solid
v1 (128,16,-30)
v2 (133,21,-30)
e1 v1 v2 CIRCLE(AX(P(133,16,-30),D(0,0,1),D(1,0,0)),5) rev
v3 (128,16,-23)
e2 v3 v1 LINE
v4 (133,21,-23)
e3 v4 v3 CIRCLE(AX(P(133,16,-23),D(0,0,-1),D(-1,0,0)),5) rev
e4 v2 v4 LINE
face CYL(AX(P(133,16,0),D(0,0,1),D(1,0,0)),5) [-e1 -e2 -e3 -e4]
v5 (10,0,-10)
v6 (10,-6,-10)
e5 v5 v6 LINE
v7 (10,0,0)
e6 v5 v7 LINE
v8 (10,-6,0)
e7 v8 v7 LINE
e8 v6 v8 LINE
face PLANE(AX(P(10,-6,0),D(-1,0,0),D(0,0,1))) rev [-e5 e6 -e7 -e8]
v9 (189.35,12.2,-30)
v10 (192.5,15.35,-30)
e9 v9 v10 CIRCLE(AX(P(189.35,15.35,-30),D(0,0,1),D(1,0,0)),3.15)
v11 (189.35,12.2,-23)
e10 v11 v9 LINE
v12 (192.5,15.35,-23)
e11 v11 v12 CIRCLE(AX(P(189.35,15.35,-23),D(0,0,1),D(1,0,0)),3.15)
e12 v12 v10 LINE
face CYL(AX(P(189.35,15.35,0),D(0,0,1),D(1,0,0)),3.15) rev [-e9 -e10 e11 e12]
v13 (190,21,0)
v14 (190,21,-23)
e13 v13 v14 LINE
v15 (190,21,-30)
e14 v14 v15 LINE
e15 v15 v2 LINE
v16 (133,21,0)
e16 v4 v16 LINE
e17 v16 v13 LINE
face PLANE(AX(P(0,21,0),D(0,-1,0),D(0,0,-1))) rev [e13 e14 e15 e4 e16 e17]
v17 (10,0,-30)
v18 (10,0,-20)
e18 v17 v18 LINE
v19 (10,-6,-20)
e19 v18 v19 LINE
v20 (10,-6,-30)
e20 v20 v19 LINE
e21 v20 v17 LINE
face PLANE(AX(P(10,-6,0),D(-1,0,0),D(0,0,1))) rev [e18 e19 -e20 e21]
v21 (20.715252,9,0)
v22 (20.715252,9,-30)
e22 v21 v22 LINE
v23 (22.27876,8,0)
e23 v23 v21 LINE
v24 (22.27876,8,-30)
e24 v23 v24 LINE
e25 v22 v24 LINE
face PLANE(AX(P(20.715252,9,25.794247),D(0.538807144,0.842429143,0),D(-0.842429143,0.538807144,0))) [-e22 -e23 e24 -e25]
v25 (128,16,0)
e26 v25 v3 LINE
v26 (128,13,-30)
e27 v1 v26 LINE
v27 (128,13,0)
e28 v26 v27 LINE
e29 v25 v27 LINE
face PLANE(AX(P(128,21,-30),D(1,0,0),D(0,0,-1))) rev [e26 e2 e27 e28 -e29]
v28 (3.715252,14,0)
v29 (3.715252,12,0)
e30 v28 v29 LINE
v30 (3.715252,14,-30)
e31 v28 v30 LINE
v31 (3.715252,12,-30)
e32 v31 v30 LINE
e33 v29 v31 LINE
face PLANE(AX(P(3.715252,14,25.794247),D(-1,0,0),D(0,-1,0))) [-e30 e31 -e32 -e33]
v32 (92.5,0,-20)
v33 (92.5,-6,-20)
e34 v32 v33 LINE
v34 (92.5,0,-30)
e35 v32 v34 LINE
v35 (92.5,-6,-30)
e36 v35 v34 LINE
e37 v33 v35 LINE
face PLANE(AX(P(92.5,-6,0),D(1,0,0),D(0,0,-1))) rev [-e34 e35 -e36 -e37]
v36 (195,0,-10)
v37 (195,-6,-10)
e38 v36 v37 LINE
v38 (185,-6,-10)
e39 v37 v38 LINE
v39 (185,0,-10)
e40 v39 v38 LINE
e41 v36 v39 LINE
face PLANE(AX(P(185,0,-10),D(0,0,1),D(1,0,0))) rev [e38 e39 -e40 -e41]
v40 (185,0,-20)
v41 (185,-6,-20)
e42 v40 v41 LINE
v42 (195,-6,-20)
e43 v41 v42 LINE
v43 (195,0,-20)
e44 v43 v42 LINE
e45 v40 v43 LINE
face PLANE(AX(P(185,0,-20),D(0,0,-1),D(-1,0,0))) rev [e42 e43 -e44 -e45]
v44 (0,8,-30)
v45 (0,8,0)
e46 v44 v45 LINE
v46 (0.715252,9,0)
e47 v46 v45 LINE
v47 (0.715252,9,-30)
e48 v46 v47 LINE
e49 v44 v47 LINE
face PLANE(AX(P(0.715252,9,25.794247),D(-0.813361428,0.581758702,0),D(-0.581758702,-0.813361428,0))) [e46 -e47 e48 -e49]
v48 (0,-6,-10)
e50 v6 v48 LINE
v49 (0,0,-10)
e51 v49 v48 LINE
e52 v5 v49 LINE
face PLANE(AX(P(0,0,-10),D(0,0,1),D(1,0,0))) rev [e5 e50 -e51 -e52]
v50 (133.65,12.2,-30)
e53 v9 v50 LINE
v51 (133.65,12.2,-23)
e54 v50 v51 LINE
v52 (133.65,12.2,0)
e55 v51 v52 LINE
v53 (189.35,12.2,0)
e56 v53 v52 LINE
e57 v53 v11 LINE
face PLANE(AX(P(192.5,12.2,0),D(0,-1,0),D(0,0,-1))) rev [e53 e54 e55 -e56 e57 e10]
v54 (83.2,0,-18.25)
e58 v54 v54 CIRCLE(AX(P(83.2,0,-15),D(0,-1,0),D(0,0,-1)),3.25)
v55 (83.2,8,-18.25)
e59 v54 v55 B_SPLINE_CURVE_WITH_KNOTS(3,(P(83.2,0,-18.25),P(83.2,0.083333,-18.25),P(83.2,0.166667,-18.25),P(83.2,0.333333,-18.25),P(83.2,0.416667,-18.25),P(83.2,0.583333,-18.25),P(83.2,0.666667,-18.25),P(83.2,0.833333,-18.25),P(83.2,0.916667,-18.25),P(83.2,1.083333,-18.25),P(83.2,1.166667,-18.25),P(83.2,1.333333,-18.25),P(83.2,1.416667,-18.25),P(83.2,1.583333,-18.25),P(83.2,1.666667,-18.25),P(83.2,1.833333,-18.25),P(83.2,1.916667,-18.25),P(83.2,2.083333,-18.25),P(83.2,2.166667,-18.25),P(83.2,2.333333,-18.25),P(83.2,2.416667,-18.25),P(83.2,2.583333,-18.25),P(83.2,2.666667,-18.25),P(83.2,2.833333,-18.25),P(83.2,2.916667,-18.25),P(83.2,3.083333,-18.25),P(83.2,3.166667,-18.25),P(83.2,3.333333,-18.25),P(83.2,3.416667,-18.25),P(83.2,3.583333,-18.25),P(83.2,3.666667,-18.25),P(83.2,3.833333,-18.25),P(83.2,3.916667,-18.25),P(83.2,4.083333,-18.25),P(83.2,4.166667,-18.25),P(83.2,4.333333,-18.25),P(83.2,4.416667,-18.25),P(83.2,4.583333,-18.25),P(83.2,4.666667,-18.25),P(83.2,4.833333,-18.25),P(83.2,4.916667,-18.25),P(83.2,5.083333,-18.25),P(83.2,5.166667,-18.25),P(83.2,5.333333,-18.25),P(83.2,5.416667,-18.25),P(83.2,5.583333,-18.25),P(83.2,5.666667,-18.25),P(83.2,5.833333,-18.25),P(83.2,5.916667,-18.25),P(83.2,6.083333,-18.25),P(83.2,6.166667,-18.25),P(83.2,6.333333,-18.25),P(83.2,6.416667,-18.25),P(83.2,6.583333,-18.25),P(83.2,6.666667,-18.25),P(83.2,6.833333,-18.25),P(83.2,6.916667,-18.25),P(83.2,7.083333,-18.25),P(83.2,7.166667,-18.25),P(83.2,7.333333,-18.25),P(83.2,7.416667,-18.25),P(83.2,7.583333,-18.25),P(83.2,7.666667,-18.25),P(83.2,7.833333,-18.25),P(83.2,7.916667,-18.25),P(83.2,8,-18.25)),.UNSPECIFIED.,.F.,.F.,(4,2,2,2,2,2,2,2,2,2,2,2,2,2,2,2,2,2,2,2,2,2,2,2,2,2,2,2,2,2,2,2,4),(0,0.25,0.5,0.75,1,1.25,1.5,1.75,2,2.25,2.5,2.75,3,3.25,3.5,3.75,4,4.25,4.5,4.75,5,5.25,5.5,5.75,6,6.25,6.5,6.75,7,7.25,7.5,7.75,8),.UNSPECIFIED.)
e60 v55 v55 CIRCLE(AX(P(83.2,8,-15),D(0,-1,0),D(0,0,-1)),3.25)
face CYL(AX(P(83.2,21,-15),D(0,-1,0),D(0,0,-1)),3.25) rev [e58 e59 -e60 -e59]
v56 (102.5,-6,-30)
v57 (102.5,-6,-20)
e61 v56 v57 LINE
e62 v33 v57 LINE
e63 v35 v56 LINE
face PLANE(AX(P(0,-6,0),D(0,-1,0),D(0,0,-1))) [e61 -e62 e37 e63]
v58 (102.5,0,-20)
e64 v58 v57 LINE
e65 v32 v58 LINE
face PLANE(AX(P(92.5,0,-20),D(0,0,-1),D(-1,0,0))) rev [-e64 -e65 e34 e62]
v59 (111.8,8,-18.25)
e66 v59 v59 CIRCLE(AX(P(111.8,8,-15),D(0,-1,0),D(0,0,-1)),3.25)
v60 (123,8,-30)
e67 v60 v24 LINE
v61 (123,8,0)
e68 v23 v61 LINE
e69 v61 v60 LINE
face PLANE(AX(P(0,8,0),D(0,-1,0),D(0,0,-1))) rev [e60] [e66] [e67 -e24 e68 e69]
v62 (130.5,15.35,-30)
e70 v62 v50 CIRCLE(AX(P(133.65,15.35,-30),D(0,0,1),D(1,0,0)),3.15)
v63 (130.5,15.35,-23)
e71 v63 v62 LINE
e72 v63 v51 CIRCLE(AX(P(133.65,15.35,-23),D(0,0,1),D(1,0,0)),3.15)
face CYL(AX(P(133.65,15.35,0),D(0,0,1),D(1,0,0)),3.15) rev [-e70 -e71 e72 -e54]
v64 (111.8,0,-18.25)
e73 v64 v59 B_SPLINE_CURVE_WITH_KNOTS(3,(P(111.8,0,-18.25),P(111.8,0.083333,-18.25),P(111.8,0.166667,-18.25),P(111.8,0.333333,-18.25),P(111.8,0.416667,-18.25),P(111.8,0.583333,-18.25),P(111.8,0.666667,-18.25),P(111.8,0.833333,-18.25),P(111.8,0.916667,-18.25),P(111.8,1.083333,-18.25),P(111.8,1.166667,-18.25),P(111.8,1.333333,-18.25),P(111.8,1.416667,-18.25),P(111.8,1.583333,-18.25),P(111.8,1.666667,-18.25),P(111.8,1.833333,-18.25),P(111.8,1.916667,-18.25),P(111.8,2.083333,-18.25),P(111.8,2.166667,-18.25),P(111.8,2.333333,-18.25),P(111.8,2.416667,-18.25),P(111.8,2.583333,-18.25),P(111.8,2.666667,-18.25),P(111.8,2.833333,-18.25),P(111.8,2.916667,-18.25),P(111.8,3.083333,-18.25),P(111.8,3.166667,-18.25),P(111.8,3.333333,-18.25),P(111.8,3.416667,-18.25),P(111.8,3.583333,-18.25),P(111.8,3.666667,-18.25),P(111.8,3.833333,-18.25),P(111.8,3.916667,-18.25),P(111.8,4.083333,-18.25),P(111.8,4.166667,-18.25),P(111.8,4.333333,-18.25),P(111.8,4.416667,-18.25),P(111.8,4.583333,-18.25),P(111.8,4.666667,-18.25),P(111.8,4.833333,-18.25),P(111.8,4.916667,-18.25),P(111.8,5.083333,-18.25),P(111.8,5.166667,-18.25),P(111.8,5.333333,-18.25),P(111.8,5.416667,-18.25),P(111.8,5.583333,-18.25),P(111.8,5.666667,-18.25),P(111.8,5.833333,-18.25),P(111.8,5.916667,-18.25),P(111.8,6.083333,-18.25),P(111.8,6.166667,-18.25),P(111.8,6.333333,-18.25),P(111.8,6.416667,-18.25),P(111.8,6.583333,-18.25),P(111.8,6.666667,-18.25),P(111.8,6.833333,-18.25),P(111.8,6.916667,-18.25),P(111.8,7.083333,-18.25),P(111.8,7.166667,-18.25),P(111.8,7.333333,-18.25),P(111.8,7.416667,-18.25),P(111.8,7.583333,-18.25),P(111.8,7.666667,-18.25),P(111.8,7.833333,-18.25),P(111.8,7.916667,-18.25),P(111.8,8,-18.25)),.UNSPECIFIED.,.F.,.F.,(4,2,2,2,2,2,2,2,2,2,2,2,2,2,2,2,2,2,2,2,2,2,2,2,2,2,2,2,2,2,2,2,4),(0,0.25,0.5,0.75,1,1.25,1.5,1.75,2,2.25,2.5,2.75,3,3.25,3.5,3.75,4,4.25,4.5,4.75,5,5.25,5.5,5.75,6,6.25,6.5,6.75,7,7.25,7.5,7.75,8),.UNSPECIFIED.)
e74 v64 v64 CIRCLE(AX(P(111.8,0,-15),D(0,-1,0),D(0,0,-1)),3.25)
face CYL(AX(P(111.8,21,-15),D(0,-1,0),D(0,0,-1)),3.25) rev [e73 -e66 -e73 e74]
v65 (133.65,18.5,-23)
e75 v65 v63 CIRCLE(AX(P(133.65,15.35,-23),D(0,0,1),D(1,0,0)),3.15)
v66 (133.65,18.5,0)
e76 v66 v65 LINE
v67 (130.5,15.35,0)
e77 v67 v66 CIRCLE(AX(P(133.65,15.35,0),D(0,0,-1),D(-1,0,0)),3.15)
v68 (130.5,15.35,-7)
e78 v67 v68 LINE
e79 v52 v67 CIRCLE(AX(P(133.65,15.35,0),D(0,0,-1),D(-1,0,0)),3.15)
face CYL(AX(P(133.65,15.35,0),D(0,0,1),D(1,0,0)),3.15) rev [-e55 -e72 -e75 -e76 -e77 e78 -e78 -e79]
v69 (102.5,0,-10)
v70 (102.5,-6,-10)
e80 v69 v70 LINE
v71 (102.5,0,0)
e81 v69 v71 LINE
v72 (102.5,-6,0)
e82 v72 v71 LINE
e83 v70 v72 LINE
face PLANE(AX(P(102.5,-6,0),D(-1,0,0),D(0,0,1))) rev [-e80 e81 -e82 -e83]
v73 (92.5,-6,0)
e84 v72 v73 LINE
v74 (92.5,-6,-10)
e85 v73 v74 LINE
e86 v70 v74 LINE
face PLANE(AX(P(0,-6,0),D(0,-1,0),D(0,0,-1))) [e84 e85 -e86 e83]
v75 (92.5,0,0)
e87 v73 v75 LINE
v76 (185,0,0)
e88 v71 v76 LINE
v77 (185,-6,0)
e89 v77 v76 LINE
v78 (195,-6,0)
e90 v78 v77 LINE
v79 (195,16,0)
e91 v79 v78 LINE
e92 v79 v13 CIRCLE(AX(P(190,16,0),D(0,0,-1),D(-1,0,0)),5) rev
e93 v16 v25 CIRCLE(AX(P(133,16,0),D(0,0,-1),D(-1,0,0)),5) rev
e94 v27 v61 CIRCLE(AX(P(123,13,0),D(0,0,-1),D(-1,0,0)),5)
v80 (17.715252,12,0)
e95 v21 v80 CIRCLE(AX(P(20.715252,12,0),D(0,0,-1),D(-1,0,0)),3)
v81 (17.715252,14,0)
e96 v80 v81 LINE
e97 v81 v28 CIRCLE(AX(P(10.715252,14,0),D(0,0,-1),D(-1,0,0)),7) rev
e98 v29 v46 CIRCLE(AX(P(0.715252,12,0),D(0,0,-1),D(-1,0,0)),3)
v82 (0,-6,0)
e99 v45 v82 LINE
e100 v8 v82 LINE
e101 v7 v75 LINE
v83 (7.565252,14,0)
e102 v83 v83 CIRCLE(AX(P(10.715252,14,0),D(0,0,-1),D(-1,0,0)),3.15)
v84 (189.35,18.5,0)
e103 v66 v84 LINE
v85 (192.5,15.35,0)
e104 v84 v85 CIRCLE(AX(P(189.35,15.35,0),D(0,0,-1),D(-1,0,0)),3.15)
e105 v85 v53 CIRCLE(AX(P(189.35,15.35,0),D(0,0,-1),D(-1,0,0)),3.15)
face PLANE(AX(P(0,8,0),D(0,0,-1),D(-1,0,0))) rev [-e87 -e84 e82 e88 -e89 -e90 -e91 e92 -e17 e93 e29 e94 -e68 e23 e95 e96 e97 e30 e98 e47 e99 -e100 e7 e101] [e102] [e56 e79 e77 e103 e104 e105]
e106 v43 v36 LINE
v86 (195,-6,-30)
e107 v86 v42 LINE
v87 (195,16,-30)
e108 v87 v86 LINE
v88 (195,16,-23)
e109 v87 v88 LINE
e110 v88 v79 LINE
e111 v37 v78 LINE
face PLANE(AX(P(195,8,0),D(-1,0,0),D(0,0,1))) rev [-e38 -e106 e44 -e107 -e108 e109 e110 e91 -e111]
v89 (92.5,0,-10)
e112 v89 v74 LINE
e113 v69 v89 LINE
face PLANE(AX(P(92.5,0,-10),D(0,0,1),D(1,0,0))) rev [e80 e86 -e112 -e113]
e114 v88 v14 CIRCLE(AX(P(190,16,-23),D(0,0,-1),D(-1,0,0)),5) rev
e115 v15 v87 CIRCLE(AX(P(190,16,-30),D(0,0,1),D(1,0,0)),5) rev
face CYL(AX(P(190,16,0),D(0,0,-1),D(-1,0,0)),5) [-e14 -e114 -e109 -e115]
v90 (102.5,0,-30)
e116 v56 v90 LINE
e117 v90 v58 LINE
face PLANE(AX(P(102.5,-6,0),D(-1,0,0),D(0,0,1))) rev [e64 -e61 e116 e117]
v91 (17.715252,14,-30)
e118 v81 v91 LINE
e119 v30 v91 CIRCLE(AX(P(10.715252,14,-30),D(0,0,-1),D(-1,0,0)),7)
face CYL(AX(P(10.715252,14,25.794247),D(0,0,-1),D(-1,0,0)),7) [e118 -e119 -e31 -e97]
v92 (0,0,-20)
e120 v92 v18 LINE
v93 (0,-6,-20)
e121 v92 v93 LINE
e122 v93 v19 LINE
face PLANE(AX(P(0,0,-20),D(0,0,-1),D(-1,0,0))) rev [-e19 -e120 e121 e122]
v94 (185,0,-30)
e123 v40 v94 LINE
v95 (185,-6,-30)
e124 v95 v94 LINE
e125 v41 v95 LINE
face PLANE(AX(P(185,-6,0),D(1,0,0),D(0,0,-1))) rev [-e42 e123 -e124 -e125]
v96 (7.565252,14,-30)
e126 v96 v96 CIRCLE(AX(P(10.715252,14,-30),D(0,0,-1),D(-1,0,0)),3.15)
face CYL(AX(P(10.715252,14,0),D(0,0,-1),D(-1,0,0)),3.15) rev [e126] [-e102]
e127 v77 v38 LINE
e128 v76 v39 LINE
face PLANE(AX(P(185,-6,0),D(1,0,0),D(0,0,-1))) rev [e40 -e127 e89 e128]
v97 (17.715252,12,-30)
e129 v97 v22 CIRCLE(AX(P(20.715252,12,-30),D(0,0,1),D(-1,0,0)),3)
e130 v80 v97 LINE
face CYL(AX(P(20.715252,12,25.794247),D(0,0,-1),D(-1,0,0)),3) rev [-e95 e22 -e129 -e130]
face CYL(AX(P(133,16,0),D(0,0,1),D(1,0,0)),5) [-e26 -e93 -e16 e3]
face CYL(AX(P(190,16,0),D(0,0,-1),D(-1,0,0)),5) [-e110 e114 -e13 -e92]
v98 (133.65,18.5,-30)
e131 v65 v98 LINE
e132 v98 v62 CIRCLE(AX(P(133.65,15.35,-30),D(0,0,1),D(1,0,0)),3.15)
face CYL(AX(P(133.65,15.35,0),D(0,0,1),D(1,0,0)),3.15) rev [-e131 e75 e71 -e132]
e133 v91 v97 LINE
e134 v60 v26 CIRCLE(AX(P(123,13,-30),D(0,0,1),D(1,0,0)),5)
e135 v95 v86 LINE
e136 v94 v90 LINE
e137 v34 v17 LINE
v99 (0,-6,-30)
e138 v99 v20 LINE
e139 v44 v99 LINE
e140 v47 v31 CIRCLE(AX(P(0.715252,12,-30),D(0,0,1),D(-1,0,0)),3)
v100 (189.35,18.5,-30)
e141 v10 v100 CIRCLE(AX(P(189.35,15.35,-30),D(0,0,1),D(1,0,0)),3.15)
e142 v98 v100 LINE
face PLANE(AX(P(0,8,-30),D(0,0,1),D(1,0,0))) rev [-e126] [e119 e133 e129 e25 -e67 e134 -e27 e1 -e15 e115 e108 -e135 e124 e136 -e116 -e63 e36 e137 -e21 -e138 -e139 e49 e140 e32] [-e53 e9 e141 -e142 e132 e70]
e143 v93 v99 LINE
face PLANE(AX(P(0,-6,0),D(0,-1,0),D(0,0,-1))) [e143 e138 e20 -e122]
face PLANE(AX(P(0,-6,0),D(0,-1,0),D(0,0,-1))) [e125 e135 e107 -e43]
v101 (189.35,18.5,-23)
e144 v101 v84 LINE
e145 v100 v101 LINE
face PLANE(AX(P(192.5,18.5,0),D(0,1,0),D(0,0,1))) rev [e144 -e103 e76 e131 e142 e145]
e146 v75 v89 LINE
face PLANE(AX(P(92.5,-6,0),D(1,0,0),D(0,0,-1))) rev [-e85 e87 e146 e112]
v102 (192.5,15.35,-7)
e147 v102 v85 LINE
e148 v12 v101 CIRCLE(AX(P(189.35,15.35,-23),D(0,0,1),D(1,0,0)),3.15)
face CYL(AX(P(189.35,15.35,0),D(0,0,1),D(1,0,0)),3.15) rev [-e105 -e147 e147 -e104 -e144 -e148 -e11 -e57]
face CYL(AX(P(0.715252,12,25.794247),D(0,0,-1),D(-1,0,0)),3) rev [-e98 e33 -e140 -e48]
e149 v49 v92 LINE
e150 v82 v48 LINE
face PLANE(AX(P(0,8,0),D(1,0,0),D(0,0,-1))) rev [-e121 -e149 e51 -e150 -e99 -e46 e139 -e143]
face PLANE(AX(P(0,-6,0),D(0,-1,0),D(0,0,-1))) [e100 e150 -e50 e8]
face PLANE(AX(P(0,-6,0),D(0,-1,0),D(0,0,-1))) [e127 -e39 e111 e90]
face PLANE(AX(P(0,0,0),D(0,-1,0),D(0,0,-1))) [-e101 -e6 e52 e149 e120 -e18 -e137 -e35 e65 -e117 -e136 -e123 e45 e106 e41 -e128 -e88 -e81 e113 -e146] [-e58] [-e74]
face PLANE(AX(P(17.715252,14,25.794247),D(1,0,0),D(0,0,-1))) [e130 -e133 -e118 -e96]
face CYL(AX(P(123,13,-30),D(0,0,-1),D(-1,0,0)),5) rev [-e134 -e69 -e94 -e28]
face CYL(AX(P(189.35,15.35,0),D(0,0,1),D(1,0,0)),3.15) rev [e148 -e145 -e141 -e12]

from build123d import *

# Parameters (mm, degrees)
SKETCH1_W           = 195
SKETCH1_H           = 30
BOSS_EXTRUDE1_DEPTH = 8
SKETCH2_W           = 12
SKETCH2_H           = 30
BOSS_EXTRUDE2_DEPTH = 12
SKETCH4_R           = 3.15
CUT_EXTRUDE1_DEPTH  = 199.305320151
FILLET1_R           = 4
FILLET2_R           = 6
BOSS_EXTRUDE4_DEPTH = 30
SKETCH15_W          = 67
SKETCH15_H          = 7
BOSS_EXTRUDE6_DEPTH = 13
SKETCH16_W          = 62
SKETCH16_H          = 6.3
CUT_EXTRUDE4_DEPTH  = 199.408669165
FILLET6_R           = 5
FILLET7_R           = 5
SKETCH17_W          = 10
SKETCH17_H          = 30
BOSS_EXTRUDE7_DEPTH = 6
FILLET8_R           = 3.15
FILLET9_R           = 5
SKETCH20_R          = 3.15
BOSS_EXTRUDE8_DEPTH = 16
SKETCH21_W          = 10
SKETCH21_H          = 30
BOSS_EXTRUDE9_DEPTH = 6
SKETCH22_W          = 10
SKETCH22_H          = 10
CUT_EXTRUDE5_DEPTH  = 6
FILLET10_R          = 5
FILLET11_R          = 3.15
SKETCH23_R          = 3.25
CUT_EXTRUDE6_DEPTH  = 199.408669165


with BuildPart() as part:
    # Sketch1 → Boss-Extrude1 (new body)
    with BuildSketch(Plane(origin=(0, 0, 0), x_dir=(1, 0, 0), z_dir=(0, 1, 0))):
        with Locations((97.5, 15)):
            Rectangle(SKETCH1_W, SKETCH1_H)
    extrude(amount=BOSS_EXTRUDE1_DEPTH)

    # Sketch2 → Boss-Extrude2 (add)
    with BuildSketch(Plane(origin=(0, 8, 0), x_dir=(1, 0, 0), z_dir=(0, 1, 0))):
        with Locations((10.715252385, 15)):
            Rectangle(SKETCH2_W, SKETCH2_H)
    extrude(amount=BOSS_EXTRUDE2_DEPTH)

    # Sketch4 → Cut-Extrude1 (cut, through all)
    with BuildSketch(Plane(origin=(0, 0, -30), x_dir=(-1, 0, 0), z_dir=(0, 0, -1))):
        with Locations((-10.715252385, 14)):
            Circle(SKETCH4_R)
    extrude(amount=-CUT_EXTRUDE1_DEPTH, mode=Mode.SUBTRACT)

    # Fillet1
    fillet1_edges = [part.edges().sort_by_distance(p)[0] for p in [
        (4.715252385, 8, -15),
        (16.715252385, 8, -15),
    ]]
    fillet(fillet1_edges, radius=FILLET1_R)

    # Fillet2
    fillet2_edges = [part.edges().sort_by_distance(p)[0] for p in [
        (4.715252385, 20, -15),
        (16.715252385, 20, -15),
    ]]
    fillet(fillet2_edges, radius=FILLET2_R - 0.0001)  # a hair under: the kernel refuses the full size

    # Sketch11 → Boss-Extrude4 (add)
    with BuildSketch(Plane(origin=(0, 0, -30), x_dir=(-1, 0, 0), z_dir=(0, 0, -1))):
        with BuildLine():
            Line((-16.715252385, 14), (-16.715252385, 12))
            ThreePointArc((-16.715252385, 12), (-17.88682526, 9.171572875), (-20.715252385, 8))
            Line((-20.715252385, 8), (-22.27876013, 8))
            Line((-22.27876013, 8), (-20.715252385, 9))
            ThreePointArc((-20.715252385, 9), (-18.593932042, 9.878679656), (-17.715252385, 12))
            Line((-17.715252385, 12), (-17.715252385, 14))
            ThreePointArc((-17.715252385, 14), (-15.664999853, 18.949747468), (-10.715252385, 21))
            ThreePointArc((-10.715252385, 21), (-5.765504917, 18.949747468), (-3.715252385, 14))
            Line((-3.715252385, 14), (-3.715252385, 12))
            ThreePointArc((-3.715252385, 12), (-2.836572729, 9.878679656), (-0.715252385, 9))
            Line((-0.715252385, 9), (0, 8))
            Line((0, 8), (-0.715252385, 8))
            ThreePointArc((-0.715252385, 8), (-3.54367951, 9.171572875), (-4.715252385, 12))
            Line((-4.715252385, 12), (-4.715252385, 14))
            ThreePointArc((-4.715252385, 14), (-6.472611698, 18.242640687), (-10.715252385, 20))
            ThreePointArc((-10.715252385, 20), (-14.957893072, 18.242640687), (-16.715252385, 14))
        make_face()
    extrude(amount=-BOSS_EXTRUDE4_DEPTH)

    # Sketch15 → Boss-Extrude6 (add)
    with BuildSketch(Plane(origin=(0, 8, 0), x_dir=(1, 0, 0), z_dir=(0, 1, 0))):
        with Locations((161.5, 26.5)):
            Rectangle(SKETCH15_W, SKETCH15_H)
        with Locations((161.5, 3.5)):
            Rectangle(SKETCH15_W, SKETCH15_H)
    extrude(amount=BOSS_EXTRUDE6_DEPTH)

    # Sketch16 → Cut-Extrude4 (cut, through all)
    with BuildSketch(Plane(origin=(0, 0, -30), x_dir=(-1, 0, 0), z_dir=(0, 0, -1))):
        with Locations((-161.5, 15.35)):
            Rectangle(SKETCH16_W, SKETCH16_H)
    extrude(amount=-CUT_EXTRUDE4_DEPTH, mode=Mode.SUBTRACT)

    # Fillet6
    fillet6_edges = [part.edges().sort_by_distance(p)[0] for p in [
        (195, 21, -26.5),
        (128, 21, -26.5),
    ]]
    fillet(fillet6_edges, radius=FILLET6_R)

    # Fillet7
    fillet7_edges = [part.edges().sort_by_distance(p)[0] for p in [
        (128, 8, -26.5),
    ]]
    fillet(fillet7_edges, radius=FILLET7_R)

    # Sketch17 → Boss-Extrude7 (add)
    with BuildSketch(Plane.XZ):
        with Locations((97.5, -15)):
            Rectangle(SKETCH17_W, SKETCH17_H)
    extrude(amount=BOSS_EXTRUDE7_DEPTH)

    # Fillet8
    fillet8_edges = [part.edges().sort_by_distance(p)[0] for p in [
        (192.5, 18.5, -3.5),
        (192.5, 12.2, -3.5),
        (130.5, 18.5, -3.5),
        (130.5, 12.2, -3.5),
    ]]
    fillet(fillet8_edges, radius=FILLET8_R - 0.0001)  # a hair under: the kernel refuses the full size

    # Fillet9
    fillet9_edges = [part.edges().sort_by_distance(p)[0] for p in [
        (128, 8, -3.5),
    ]]
    fillet(fillet9_edges, radius=FILLET9_R)

    # Sketch20 → Boss-Extrude8 (add)
    with BuildSketch(Plane.XY.offset(-23)):
        with BuildLine():
            Line((195, 0), (195, 21))
            Line((195, 21), (128, 21))
            Line((128, 21), (128, 13))
            ThreePointArc((128, 13), (126.535533906, 9.464466094), (123, 8))
            Line((123, 8), (22.27876013, 8))
            Line((22.27876013, 8), (20.715252385, 9))
            ThreePointArc((20.715252385, 9), (18.593932042, 9.878679656), (17.715252385, 12))
            Line((17.715252385, 12), (17.715252385, 14))
            ThreePointArc((17.715252385, 14), (10.715252385, 21), (3.715252385, 14))
            Line((3.715252385, 14), (3.715252385, 12))
            ThreePointArc((3.715252385, 12), (2.836572729, 9.878679656), (0.715252385, 9))
            Line((0.715252385, 9), (0, 8))
            Line((0, 8), (0, 0))
            Line((0, 0), (92.5, 0))
            Line((92.5, 0), (92.5, -6))
            Line((92.5, -6), (102.5, -6))
            Line((102.5, -6), (102.5, 0))
            Line((102.5, 0), (195, 0))
        make_face()
        with Locations(Location((10.715252385, 14, 0), (0, 0, 180))):
            Circle(SKETCH20_R, mode=Mode.SUBTRACT)
        with BuildLine():
            Line((133.65, 12.2), (189.35, 12.2))
            ThreePointArc((189.35, 12.2), (191.577386361, 13.122613639), (192.5, 15.35))
            ThreePointArc((192.5, 15.35), (191.577386361, 17.577386361), (189.35, 18.5))
            Line((189.35, 18.5), (133.65, 18.5))
            ThreePointArc((133.65, 18.5), (131.422613639, 17.577386361), (130.5, 15.35))
            ThreePointArc((130.5, 15.35), (131.422613639, 13.122613639), (133.65, 12.2))
        make_face(mode=Mode.SUBTRACT)
    extrude(amount=BOSS_EXTRUDE8_DEPTH)

    # Sketch21 → Boss-Extrude9 (add)
    with BuildSketch(Plane(origin=(0, 0, 0), x_dir=(-1, 0, 0), z_dir=(0, -1, 0))):
        with Locations((-5, 15)):
            Rectangle(SKETCH21_W, SKETCH21_H)
        with Locations((-190, 15)):
            Rectangle(SKETCH21_W, SKETCH21_H)
    extrude(amount=BOSS_EXTRUDE9_DEPTH)

    # Sketch22 → Cut-Extrude5 (cut)
    with BuildSketch(Plane(origin=(0, -6, 0), x_dir=(-1, 0, 0), z_dir=(0, -1, 0))):
        with Locations((-5, 15)):
            Rectangle(SKETCH22_W, SKETCH22_H)
        with Locations((-97.5, 15)):
            Rectangle(SKETCH22_W, SKETCH22_H)
        with Locations((-190, 15)):
            Rectangle(SKETCH22_W, SKETCH22_H)
    extrude(amount=-CUT_EXTRUDE5_DEPTH, mode=Mode.SUBTRACT)

    # Fillet10
    fillet10_edges = [part.edges().sort_by_distance(p)[0] for p in [
        (128, 21, -11.5),
        (195, 21, -11.5),
    ]]
    fillet(fillet10_edges, radius=FILLET10_R)

    # Fillet11
    fillet11_edges = [part.edges().sort_by_distance(p)[0] for p in [
        (130.5, 18.5, -26.5),
        (130.5, 12.2, -26.5),
        (192.5, 12.2, -26.5),
        (192.5, 18.5, -26.5),
    ]]
    fillet(fillet11_edges, radius=FILLET11_R - 0.0001)  # a hair under: the kernel refuses the full size

    # Sketch23 → Cut-Extrude6 (cut, through all)
    with BuildSketch(Plane.XZ):
        with Locations(Location((83.2, -15, 0), (0, 0, 270))):
            Circle(SKETCH23_R)
        with Locations(Location((111.8, -15, 0), (0, 0, 270))):
            Circle(SKETCH23_R)
    extrude(amount=-CUT_EXTRUDE6_DEPTH, mode=Mode.SUBTRACT)


solid = part.part
